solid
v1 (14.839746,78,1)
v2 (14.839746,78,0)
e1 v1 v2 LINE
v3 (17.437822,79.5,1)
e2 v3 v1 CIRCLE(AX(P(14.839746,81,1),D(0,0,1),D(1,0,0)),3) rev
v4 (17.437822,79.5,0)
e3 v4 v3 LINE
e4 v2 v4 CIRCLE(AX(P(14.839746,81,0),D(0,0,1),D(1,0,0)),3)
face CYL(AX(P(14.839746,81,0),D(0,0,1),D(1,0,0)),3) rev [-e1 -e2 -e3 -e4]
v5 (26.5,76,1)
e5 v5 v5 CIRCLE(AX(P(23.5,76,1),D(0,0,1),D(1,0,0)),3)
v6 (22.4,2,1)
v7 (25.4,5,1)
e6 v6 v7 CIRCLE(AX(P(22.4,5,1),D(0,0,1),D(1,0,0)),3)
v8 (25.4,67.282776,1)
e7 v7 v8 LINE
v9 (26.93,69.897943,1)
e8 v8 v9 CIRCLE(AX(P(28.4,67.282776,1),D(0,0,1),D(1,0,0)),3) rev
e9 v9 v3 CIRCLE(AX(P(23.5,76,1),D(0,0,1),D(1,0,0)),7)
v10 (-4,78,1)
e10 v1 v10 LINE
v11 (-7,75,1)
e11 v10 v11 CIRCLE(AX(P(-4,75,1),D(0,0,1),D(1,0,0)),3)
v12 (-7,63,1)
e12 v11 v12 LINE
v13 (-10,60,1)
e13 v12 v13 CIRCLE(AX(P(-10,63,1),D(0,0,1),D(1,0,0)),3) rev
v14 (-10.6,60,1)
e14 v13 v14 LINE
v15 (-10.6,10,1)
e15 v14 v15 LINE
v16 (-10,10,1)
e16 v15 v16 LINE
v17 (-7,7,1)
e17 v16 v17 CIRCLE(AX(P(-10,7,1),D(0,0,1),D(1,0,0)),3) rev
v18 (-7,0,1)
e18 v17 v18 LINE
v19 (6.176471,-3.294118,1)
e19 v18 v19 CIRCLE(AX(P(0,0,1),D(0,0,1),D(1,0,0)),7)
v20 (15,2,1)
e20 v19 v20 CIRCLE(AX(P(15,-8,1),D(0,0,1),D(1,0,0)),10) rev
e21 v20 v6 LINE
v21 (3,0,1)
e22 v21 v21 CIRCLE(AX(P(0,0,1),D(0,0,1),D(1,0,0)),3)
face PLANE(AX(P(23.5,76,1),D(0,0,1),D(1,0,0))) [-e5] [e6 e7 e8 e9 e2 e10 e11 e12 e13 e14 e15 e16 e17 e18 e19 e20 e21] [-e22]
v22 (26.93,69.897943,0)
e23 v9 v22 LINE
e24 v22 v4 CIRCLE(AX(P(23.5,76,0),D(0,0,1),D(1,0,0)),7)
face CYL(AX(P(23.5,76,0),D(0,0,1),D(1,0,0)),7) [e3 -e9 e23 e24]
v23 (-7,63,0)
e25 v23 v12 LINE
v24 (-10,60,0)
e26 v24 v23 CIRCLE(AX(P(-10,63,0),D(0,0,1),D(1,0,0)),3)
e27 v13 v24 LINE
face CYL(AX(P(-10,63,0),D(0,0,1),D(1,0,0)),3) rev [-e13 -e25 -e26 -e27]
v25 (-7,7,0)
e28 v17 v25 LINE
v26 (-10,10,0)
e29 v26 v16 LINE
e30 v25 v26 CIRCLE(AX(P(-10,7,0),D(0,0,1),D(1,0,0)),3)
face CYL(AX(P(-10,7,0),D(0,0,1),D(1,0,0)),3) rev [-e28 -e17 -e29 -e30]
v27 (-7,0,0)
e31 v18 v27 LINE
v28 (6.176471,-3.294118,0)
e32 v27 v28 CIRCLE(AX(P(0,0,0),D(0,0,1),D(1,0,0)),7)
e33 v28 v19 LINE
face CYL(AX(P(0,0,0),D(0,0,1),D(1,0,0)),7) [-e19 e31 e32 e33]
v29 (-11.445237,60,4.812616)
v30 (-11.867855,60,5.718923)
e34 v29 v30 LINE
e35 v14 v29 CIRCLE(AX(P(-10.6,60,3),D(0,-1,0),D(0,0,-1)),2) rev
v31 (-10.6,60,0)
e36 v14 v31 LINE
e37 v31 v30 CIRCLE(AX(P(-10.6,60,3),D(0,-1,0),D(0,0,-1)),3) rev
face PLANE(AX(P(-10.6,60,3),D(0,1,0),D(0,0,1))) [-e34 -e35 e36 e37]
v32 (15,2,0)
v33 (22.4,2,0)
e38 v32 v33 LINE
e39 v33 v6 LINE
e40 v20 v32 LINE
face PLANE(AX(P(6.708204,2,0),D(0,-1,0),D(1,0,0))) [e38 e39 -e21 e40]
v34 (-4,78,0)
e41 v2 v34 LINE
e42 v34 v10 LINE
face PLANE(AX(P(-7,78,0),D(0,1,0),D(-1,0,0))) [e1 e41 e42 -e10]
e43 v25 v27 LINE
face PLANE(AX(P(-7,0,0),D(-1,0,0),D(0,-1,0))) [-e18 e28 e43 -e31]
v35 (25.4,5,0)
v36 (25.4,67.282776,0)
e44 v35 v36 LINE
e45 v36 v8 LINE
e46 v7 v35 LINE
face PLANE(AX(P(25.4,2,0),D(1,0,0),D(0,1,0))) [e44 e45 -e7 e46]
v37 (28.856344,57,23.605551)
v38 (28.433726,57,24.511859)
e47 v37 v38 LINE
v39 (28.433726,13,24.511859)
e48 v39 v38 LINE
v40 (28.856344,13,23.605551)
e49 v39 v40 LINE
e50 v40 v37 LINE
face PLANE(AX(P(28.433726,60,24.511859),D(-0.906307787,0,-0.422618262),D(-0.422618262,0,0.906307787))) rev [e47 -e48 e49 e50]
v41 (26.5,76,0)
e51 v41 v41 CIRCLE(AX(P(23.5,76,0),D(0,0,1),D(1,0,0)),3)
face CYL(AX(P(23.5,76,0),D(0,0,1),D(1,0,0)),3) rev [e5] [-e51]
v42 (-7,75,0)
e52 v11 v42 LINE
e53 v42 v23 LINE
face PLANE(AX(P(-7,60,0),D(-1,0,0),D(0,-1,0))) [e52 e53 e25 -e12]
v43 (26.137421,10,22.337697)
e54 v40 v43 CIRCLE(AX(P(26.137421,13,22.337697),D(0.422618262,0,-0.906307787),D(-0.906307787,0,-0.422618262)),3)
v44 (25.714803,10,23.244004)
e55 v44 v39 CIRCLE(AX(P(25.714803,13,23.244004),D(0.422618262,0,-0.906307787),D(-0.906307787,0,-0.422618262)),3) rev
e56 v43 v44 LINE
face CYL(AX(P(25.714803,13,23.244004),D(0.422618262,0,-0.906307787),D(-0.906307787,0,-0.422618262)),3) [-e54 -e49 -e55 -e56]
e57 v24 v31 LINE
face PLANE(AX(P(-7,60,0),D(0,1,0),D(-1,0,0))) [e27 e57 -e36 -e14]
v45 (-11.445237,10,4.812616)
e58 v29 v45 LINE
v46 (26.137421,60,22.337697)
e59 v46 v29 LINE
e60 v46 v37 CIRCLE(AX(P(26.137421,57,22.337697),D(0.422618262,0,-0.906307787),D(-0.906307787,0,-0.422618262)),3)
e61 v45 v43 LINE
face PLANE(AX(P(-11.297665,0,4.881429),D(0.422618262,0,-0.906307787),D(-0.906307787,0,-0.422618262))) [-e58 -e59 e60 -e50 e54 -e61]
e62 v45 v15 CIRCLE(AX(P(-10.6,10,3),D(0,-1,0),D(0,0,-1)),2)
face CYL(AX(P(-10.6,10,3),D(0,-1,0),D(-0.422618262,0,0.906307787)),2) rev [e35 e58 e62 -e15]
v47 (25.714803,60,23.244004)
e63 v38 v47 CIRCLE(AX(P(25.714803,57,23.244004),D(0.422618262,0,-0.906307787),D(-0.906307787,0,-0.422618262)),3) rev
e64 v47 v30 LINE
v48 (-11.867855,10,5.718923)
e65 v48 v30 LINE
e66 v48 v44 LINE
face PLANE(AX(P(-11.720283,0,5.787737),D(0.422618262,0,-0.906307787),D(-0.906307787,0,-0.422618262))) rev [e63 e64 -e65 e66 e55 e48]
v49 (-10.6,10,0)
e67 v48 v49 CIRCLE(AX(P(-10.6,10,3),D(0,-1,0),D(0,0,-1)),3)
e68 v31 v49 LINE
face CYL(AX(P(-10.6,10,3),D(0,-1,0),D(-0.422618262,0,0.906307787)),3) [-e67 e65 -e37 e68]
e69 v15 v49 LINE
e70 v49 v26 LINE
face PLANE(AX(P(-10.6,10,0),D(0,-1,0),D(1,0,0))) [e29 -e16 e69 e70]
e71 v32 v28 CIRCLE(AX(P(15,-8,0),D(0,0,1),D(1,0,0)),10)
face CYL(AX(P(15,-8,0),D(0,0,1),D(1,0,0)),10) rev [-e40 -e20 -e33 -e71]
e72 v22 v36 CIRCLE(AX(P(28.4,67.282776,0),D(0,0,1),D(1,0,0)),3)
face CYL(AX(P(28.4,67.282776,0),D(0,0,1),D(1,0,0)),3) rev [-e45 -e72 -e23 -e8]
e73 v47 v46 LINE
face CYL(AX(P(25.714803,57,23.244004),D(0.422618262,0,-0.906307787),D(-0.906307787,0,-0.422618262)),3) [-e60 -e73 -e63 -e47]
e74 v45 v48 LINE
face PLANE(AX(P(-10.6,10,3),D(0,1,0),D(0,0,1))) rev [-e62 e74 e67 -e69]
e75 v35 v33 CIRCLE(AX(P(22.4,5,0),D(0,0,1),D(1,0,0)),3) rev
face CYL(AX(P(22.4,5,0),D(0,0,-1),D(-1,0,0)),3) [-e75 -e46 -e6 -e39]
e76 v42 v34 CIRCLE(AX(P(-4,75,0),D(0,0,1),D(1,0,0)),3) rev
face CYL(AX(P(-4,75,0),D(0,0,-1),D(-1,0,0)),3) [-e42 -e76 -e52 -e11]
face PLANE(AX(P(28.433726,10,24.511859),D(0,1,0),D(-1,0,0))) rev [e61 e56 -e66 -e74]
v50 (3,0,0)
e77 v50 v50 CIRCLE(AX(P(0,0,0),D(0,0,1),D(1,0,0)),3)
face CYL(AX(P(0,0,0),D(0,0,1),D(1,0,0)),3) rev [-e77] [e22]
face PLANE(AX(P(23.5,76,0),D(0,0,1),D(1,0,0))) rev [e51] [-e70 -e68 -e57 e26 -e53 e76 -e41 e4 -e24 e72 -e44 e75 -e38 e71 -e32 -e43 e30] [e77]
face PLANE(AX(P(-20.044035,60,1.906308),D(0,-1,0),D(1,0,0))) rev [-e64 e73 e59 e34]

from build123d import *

# Parameters (mm, degrees)
SKETCH1_R           = 3
BOSS_EXTRUDE1_DEPTH = 1
EDGE_FLANGE1_DEPTH  = 50
FILLET1_R           = 3
FILLET2_R           = 10


# Sheet-metal steps are written as plain solids
with BuildPart() as part:
    # Sketch1 → Boss-Extrude1 (new body)
    with BuildSketch(Plane.XY):
        with BuildLine():
            Line((6.708203932, 2), (25.4, 2))
            Line((25.4, 2), (25.4, 69.262789895))
            ThreePointArc((25.4, 69.262789895), (28.486423204, 80.912797943), (16.791796068, 78))
            Line((16.791796068, 78), (-7, 78))
            Line((-7, 78), (-7, 60))
            Line((-7, 60), (-10.6, 60))
            Line((-10.6, 60), (-10.6, 10))
            Line((-10.6, 10), (-7, 10))
            Line((-7, 10), (-7, 0))
            ThreePointArc((-7, 0), (1.010587075, -6.926666858), (6.708203932, 2))
        make_face()
        Circle(SKETCH1_R, mode=Mode.SUBTRACT)
        with Locations((23.5, 76)):
            Circle(SKETCH1_R, mode=Mode.SUBTRACT)
    extrude(amount=BOSS_EXTRUDE1_DEPTH)

    # Edge-Flange1 section (across the edge) → Edge-Flange1 (add)
    with BuildSketch(Plane(origin=(-19.621417007, 60, 1), x_dir=(0.4226182617407006, 0, -0.9063077870366494), z_dir=(0, -1, 0))):
        with BuildLine():
            Line((-1, 9.021417007), (-1, 53.489291496))
            Line((-1, 53.489291496), (0, 53.489291496))
            Line((0, 53.489291496), (0, 9.021417007))
            ThreePointArc((0, 9.021417007), (1.567120772, 7.068824993), (3.812615574, 8.176180484))
            Line((3.812615574, 8.176180484), (4.718923361, 7.753562222))
            ThreePointArc((4.718923361, 7.753562222), (1.350681158, 6.092528986), (-1, 9.021417007))
        make_face()
    extrude(amount=EDGE_FLANGE1_DEPTH)

    # Fillet1
    fillet1_edges = [part.edges().sort_by_distance(p)[0] for p in [
        (-7, 78, 0.5),
        (-7, 60, 0.5),
        (-7, 10, 0.5),
        (25.4, 2, 0.5),
        (25.4, 69.262789895, 0.5),
        (16.791796068, 78, 0.5),
        (28.645035268, 60, 24.058705287),
        (28.645035268, 10, 24.058705287),
    ]]
    fillet(fillet1_edges, radius=FILLET1_R)

    # Fillet2
    fillet2_edges = [part.edges().sort_by_distance(p)[0] for p in [
        (6.708203932, 2, 0.5),
    ]]
    fillet(fillet2_edges, radius=FILLET2_R)


solid = part.part
